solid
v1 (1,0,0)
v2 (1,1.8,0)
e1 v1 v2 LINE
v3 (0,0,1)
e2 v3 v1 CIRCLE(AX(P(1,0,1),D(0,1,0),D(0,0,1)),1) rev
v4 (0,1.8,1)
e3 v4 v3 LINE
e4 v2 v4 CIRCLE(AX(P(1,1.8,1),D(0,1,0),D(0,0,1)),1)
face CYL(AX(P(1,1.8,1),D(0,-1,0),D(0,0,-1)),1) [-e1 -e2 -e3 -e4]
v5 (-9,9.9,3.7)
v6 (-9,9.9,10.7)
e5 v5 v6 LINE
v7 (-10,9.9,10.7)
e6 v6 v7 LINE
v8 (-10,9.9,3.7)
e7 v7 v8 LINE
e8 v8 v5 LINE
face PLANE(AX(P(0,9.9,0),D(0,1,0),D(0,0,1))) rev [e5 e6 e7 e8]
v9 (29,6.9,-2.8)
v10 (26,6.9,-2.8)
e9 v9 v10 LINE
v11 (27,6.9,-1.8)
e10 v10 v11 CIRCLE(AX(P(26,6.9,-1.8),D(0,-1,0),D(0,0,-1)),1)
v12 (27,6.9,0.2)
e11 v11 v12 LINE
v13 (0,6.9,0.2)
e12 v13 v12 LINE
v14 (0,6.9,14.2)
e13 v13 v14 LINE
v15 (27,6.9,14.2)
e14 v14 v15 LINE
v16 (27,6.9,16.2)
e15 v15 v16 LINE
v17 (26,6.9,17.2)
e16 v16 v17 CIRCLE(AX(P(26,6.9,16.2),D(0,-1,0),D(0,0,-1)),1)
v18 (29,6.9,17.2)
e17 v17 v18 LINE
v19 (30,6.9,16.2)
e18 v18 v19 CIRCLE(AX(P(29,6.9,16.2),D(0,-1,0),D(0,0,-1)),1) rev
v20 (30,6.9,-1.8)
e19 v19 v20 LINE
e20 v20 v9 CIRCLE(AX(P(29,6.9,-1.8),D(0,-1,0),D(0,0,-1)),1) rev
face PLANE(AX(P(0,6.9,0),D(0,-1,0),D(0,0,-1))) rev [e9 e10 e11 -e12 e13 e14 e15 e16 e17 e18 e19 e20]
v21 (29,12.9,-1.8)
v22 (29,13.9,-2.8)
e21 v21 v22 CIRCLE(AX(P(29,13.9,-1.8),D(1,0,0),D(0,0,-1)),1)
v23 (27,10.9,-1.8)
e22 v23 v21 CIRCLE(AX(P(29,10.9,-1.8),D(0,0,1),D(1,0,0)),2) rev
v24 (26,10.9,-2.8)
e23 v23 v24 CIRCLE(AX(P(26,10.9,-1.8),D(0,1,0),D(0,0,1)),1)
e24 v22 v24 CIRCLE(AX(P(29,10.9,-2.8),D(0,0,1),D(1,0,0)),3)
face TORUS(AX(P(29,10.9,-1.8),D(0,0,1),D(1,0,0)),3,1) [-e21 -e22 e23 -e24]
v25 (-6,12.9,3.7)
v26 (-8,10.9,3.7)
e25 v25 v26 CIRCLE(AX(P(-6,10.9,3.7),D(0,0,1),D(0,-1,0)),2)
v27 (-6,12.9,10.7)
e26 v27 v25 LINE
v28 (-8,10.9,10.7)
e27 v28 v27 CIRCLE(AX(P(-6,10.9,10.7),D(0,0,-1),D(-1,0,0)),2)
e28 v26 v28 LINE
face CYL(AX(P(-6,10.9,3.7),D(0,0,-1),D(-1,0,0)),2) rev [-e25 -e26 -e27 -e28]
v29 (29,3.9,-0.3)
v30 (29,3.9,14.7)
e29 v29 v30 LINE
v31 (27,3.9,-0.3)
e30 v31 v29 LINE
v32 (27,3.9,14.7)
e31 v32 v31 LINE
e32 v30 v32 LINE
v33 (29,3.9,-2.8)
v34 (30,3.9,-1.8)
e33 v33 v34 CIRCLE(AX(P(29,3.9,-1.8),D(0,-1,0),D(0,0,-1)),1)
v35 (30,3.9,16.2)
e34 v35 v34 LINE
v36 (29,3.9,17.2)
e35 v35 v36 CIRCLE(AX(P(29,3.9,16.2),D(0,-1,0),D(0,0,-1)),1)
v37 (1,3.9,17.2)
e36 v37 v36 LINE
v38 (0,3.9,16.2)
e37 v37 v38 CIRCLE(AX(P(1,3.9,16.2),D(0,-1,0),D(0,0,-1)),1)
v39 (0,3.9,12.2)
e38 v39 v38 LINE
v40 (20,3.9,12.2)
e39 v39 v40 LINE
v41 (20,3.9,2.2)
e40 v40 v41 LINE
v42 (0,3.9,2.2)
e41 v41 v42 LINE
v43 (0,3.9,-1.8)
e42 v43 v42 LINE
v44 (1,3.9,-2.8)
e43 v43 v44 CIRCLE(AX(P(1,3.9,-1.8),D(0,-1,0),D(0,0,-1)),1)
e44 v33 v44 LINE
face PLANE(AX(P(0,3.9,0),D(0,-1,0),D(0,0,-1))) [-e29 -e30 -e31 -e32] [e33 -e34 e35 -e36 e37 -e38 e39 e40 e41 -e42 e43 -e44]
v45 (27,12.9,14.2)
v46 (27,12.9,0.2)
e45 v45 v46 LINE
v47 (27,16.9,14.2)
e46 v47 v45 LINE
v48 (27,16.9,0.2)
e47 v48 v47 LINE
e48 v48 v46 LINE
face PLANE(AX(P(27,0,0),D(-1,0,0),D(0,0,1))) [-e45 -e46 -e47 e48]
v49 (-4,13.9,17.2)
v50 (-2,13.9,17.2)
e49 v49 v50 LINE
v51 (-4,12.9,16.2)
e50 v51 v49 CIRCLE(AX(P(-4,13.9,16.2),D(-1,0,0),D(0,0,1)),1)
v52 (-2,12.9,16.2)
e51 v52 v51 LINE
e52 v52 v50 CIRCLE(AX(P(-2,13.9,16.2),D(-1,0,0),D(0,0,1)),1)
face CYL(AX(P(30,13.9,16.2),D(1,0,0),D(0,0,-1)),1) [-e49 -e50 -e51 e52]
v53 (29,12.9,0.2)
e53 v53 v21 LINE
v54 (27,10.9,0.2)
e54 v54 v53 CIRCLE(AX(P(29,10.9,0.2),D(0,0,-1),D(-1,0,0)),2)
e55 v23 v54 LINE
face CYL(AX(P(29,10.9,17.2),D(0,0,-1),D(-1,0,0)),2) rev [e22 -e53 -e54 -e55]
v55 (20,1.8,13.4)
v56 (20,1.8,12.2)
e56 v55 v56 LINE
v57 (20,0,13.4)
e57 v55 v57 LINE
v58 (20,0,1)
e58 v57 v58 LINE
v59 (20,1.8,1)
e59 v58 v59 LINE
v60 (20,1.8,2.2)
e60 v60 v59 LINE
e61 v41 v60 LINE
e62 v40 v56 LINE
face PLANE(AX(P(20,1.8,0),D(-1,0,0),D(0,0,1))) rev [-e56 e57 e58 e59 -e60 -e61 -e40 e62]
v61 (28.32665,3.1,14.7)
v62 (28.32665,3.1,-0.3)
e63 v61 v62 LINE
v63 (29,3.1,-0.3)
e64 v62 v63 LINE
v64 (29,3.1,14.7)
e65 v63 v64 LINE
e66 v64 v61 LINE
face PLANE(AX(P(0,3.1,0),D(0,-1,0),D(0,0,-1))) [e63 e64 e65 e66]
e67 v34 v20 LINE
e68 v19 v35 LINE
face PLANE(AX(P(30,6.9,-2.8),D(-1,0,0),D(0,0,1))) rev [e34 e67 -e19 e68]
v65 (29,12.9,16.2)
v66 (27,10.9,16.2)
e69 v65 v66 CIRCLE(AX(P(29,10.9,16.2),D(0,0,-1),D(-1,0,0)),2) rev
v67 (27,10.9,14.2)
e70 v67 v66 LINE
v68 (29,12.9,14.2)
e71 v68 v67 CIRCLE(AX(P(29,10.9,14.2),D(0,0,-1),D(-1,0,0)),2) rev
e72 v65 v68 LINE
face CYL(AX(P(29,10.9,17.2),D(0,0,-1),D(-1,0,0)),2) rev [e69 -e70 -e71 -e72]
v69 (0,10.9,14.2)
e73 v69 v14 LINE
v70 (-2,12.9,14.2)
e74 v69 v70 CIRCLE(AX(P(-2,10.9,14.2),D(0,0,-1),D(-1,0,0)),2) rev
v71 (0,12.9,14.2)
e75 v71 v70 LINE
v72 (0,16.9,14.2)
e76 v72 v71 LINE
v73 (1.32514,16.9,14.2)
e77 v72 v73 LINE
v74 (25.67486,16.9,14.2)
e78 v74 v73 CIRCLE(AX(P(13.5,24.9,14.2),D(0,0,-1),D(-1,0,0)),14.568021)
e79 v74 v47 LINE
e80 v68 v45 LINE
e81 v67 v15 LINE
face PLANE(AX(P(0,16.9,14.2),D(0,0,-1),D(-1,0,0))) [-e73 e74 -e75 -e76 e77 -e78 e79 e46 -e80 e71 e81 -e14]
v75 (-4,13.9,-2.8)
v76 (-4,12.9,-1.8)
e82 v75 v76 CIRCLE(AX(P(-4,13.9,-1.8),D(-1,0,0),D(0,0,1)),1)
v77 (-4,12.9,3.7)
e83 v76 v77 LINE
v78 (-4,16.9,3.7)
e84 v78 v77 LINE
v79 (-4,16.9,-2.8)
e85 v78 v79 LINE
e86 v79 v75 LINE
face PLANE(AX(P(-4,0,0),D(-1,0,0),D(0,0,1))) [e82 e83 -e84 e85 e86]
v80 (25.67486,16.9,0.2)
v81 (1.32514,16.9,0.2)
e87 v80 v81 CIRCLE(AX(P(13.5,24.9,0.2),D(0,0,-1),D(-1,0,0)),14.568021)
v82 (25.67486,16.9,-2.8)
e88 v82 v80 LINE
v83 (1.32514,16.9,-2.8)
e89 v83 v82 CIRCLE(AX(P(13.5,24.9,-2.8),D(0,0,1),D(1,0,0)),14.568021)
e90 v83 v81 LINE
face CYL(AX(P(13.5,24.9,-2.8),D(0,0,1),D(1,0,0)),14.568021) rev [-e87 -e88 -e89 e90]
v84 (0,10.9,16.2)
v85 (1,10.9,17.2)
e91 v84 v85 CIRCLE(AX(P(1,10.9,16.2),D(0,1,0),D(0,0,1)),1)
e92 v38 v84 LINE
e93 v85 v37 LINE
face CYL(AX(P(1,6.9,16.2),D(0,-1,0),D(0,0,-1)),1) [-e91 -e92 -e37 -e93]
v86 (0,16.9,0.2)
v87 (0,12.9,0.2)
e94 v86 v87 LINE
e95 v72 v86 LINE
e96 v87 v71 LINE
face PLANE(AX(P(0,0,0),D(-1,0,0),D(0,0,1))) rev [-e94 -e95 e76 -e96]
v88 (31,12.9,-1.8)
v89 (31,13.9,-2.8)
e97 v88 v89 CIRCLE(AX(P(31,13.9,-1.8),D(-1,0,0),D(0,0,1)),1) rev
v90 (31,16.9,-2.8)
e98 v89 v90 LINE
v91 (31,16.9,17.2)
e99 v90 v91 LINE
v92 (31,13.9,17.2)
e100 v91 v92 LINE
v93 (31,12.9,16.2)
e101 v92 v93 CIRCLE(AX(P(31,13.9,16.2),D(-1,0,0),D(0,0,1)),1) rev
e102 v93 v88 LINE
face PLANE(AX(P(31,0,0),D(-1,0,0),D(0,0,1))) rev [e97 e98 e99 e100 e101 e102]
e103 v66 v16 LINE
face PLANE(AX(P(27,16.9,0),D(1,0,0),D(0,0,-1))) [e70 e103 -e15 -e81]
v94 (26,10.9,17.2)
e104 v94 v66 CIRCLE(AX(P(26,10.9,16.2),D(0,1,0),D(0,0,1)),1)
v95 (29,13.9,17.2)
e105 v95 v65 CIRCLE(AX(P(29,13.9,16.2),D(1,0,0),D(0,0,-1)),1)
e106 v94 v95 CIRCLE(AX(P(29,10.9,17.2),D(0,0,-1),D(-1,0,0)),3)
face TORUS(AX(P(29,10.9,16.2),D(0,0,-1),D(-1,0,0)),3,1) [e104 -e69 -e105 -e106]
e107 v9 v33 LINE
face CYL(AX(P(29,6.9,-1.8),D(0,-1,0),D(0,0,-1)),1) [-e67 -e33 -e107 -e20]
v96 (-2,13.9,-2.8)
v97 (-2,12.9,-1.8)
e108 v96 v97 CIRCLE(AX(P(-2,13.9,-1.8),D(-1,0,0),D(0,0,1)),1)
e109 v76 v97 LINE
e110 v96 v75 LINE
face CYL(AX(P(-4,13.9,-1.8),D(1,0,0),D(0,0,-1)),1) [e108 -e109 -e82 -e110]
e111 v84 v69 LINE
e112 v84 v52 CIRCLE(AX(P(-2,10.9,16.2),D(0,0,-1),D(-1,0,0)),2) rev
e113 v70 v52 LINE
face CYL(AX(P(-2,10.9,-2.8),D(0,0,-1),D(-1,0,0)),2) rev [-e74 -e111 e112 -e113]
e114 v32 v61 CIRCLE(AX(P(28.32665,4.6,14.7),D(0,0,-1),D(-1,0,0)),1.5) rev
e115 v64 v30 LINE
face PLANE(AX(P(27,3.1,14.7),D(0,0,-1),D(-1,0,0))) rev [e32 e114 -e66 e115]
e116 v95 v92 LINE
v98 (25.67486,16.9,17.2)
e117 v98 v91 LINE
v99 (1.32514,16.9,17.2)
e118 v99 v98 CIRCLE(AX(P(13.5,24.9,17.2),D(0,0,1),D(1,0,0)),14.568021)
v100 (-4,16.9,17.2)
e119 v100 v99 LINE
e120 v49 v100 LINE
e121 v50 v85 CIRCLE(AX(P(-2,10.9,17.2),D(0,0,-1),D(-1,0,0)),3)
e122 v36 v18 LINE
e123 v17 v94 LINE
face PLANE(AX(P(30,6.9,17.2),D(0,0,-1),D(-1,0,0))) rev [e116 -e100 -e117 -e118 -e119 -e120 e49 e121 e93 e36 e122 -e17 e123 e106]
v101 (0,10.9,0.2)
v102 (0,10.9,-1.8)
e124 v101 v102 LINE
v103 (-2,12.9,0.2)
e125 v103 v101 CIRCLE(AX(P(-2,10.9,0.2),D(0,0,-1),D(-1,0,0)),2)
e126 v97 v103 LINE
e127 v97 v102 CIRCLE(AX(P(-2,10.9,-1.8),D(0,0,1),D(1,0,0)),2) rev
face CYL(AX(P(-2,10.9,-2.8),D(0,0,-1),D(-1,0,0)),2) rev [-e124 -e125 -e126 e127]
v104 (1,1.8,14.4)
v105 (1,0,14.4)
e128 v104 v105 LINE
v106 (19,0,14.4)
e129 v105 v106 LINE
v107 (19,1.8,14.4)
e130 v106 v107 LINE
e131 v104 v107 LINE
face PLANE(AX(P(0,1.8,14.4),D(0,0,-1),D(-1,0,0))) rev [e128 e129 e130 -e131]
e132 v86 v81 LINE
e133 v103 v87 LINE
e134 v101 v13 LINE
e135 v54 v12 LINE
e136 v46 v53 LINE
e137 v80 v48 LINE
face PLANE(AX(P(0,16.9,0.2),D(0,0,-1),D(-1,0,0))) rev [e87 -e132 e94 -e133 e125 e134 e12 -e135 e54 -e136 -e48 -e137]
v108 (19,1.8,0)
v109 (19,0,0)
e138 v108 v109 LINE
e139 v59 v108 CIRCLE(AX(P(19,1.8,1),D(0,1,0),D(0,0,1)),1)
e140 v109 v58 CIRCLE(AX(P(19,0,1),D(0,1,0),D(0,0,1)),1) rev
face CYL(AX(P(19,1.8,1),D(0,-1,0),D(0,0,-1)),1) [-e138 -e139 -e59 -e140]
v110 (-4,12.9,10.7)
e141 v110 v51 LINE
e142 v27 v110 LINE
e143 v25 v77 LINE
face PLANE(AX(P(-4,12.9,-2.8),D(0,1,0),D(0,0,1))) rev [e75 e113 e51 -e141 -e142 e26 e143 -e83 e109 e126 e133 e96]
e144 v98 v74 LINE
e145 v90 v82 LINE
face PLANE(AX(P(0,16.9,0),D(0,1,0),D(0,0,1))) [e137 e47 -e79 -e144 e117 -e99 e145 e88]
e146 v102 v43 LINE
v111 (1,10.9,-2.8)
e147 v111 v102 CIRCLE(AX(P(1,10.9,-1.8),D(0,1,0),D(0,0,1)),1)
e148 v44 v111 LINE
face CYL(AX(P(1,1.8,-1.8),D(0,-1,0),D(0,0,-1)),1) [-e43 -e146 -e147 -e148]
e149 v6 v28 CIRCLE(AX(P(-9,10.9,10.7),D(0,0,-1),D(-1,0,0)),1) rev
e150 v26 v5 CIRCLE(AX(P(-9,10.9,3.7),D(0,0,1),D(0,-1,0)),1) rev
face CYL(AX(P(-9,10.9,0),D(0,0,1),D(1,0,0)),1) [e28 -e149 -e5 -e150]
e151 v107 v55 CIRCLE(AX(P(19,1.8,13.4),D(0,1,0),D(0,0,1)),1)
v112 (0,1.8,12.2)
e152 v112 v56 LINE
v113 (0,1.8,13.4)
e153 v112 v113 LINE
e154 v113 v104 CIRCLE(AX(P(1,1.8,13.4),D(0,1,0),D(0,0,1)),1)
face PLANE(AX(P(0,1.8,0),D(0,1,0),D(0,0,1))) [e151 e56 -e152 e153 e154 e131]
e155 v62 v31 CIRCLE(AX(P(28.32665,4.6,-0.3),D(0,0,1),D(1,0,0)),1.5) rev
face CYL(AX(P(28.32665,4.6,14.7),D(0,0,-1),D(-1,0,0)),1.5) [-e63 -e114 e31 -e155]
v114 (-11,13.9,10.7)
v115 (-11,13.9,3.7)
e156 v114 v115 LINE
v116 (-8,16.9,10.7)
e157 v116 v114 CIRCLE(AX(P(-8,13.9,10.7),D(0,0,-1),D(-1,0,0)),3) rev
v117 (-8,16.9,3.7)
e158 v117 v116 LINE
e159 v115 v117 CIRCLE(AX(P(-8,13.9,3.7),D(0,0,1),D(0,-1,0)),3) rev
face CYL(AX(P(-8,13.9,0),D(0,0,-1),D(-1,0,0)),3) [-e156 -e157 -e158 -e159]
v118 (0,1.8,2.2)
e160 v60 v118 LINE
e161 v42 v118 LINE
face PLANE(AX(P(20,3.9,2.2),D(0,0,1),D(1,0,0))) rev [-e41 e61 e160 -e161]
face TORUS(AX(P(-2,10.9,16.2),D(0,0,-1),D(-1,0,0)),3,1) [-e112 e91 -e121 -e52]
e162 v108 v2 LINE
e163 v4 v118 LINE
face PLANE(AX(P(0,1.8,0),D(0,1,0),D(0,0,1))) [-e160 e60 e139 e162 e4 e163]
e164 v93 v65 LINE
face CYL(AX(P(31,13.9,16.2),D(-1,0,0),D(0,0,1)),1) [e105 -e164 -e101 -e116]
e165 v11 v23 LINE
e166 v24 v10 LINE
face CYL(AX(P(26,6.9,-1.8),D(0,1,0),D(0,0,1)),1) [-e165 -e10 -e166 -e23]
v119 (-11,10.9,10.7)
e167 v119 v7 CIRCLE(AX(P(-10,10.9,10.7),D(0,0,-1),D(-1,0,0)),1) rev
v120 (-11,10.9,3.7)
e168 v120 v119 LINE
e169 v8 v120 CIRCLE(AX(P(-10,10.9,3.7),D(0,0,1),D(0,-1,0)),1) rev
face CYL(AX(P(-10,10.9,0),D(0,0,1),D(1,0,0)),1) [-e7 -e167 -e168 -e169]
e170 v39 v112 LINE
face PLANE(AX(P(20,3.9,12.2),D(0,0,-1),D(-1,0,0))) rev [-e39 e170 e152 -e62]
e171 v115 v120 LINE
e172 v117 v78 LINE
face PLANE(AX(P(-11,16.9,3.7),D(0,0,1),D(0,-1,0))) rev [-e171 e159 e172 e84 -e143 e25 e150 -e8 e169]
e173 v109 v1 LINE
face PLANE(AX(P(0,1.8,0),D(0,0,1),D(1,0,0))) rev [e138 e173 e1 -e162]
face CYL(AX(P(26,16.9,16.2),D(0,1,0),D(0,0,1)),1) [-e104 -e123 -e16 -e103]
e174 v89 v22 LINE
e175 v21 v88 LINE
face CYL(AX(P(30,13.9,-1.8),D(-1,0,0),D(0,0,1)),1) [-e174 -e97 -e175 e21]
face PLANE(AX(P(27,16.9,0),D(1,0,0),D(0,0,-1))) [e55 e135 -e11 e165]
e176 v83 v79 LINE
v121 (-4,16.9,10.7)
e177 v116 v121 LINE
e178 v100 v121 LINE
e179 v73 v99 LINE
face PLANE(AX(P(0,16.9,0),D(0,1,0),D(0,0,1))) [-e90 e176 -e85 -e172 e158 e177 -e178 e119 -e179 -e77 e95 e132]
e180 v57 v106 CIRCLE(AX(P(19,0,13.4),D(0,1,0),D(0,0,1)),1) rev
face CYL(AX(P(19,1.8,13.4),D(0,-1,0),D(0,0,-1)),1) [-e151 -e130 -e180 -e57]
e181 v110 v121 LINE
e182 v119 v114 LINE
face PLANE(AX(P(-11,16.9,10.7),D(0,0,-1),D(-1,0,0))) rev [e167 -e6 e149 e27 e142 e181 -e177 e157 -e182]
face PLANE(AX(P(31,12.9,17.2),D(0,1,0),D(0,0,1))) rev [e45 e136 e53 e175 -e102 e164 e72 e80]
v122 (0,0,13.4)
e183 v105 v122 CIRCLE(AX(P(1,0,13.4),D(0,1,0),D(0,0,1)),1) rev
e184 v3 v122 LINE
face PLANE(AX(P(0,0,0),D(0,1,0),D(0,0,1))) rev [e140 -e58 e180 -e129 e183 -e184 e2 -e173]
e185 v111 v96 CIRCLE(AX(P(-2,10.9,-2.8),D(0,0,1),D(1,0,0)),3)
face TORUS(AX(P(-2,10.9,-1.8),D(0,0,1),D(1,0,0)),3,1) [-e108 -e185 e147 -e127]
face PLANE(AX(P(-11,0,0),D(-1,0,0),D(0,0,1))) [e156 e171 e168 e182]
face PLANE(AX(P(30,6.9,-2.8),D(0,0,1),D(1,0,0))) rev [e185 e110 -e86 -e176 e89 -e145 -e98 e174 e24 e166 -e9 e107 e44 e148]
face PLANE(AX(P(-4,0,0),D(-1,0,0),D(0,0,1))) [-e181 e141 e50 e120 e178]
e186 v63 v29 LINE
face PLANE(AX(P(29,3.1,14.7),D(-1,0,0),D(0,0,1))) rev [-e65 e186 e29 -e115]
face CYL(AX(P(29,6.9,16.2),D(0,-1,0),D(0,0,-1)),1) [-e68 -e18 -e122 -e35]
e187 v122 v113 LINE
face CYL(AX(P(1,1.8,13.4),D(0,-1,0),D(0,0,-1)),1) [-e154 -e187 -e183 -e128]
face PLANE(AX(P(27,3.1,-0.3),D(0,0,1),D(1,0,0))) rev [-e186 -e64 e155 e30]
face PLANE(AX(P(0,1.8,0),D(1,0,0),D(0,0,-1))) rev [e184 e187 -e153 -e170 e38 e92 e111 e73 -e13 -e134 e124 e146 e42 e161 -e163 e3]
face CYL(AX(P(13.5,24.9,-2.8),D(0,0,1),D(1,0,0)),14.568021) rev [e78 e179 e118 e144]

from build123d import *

# Parameters (mm, degrees)
SKETCH1_W            = 20
SKETCH1_H            = 14.4
BOSS_EXTRUDE1_DEPTH  = 1.8
SKETCH2_W            = 20
SKETCH2_H            = 10
BOSS_EXTRUDE2_DEPTH  = 2.1
SKETCH3_W            = 30
SKETCH3_H            = 20
BOSS_EXTRUDE3_DEPTH  = 3
SKETCH4_W            = 2
SKETCH4_H            = 15
BOSS_EXTRUDE4_DEPTH  = 0.8
FILLET1_R            = 1.5
SKETCH5_W            = 27
SKETCH5_H            = 3
BOSS_EXTRUDE6_DEPTH  = 10
CUT_EXTRUDE1_DEPTH   = 40.819718733
SKETCH7_W            = 20
SKETCH7_H            = 4
BOSS_EXTRUDE7_DEPTH  = 4
SKETCH8_W            = 20
SKETCH8_H            = 4
BOSS_EXTRUDE8_DEPTH  = 4
FILLET3_R            = 2
FILLET2_R            = 1
FILLET4_R            = 1
SKETCH10_W           = 7
SKETCH10_H           = 4
BOSS_EXTRUDE10_DEPTH = 7
SKETCH11_W           = 3
SKETCH11_H           = 7
BOSS_EXTRUDE11_DEPTH = 3
FILLET5_R            = 2
FILLET6_R            = 1
FILLET7_R            = 3


# Some blends are built 0.0001 mm under size
with BuildPart() as part:
    # Sketch1 → Boss-Extrude1 (new body)
    with BuildSketch(Plane(origin=(0, 0, 0), x_dir=(1, 0, 0), z_dir=(0, 1, 0))):
        with Locations((10, -7.2)):
            Rectangle(SKETCH1_W, SKETCH1_H)
    extrude(amount=BOSS_EXTRUDE1_DEPTH)

    # Sketch2 → Boss-Extrude2 (add)
    with BuildSketch(Plane(origin=(0, 1.8, 0), x_dir=(1, 0, 0), z_dir=(0, 1, 0))):
        with Locations((10, -7.2)):
            Rectangle(SKETCH2_W, SKETCH2_H)
    extrude(amount=BOSS_EXTRUDE2_DEPTH)

    # Sketch3 → Boss-Extrude3 (add)
    with BuildSketch(Plane(origin=(0, 3.9, 0), x_dir=(1, 0, 0), z_dir=(0, 1, 0))):
        with Locations((15, -7.2)):
            Rectangle(SKETCH3_W, SKETCH3_H)
    extrude(amount=BOSS_EXTRUDE3_DEPTH)

    # Sketch4 → Boss-Extrude4 (add)
    with BuildSketch(Plane(origin=(0, 3.9, 0), x_dir=(-1, 0, 0), z_dir=(0, -1, 0))):
        with Locations((-28, -7.2)):
            Rectangle(SKETCH4_W, SKETCH4_H)
    extrude(amount=BOSS_EXTRUDE4_DEPTH)

    # Fillet1
    # the kernel refuses this fillet: 1.5 mm, written as the material it takes off along each edge
    with BuildSketch(Plane(origin=(27, 3.1, -3.61662479), x_dir=(0, 1, 0), z_dir=(0, 0, 1))) as fillet1_piece_1:
        with BuildLine():
            CenterArc((1.5, -1.326649916), FILLET1_R, 117.818139285, 62.181860715)
            Line((0, -1.326649916), (-0.03, -1.326649916))
            Line((-0.03, -1.326649916), (-0.03, 0))
            Line((-0.03, 0), (0, 0.03))
            ThreePointArc((0, 0.03), (0.4, 0.03), (0.786, 0.026532998))
            Line((0.786, 0.026532998), (0.8, 0))
        make_face()
    extrude(amount=21.633249581, mode=Mode.SUBTRACT)

    # Sketch5 → Boss-Extrude6 (add)
    with BuildSketch(Plane(origin=(0, 6.9, 0), x_dir=(1, 0, 0), z_dir=(0, 1, 0))):
        with Locations((13.5, 1.3)):
            Rectangle(SKETCH5_W, SKETCH5_H)
        with Locations((13.5, -15.7)):
            Rectangle(SKETCH5_W, SKETCH5_H)
    extrude(amount=BOSS_EXTRUDE6_DEPTH)

    # Sketch6 → Cut-Extrude1 (cut, through all)
    with BuildSketch(Plane.XY.offset(17.2)):
        with BuildLine():
            Line((1.325139576, 16.9), (25.674860424, 16.9))
            ThreePointArc((25.674860424, 16.9), (13.5, 10.331979326), (1.325139576, 16.9))
        make_face()
    extrude(amount=-CUT_EXTRUDE1_DEPTH, mode=Mode.SUBTRACT)

    # Sketch7 → Boss-Extrude7 (add)
    with BuildSketch(Plane(origin=(27, 0, 0), x_dir=(0, 0, -1), z_dir=(1, 0, 0))):
        with Locations((-7.2, 14.9)):
            Rectangle(SKETCH7_W, SKETCH7_H)
    extrude(amount=BOSS_EXTRUDE7_DEPTH)

    # Sketch8 → Boss-Extrude8 (add)
    with BuildSketch(Plane.ZY):
        with Locations((7.2, 14.9)):
            Rectangle(SKETCH8_W, SKETCH8_H)
    extrude(amount=BOSS_EXTRUDE8_DEPTH)

    # Fillet3
    fillet3_edges = [part.edges().sort_by_distance(p)[0] for p in [
        (27, 12.9, 15.7),
        (27, 12.9, -1.3),
        (0, 12.9, 15.7),
        (0, 12.9, -1.3),
    ]]
    fillet(fillet3_edges, radius=FILLET3_R)

    # Fillet2
    fillet2_edges = [part.edges().sort_by_distance(p)[0] for p in [
        (-3, 12.9, -2.8),
        (-3, 12.9, 17.2),
        (0, 7.4, -2.8),
        (0, 7.4, 17.2),
        (-0.585786438, 12.314213562, 17.2),
        (-0.585786438, 12.314213562, -2.8),
        (30, 5.4, 17.2),
        (30, 5.4, -2.8),
        (0, 0.9, 0),
        (20, 0.9, 0),
        (20, 0.9, 14.4),
        (0, 0.9, 14.4),
    ]]
    fillet(fillet2_edges, radius=FILLET2_R)

    # Fillet4
    fillet4_edges = [part.edges().sort_by_distance(p)[0] for p in [
        (30, 12.9, 17.2),
        (30, 12.9, -2.8),
        (27, 8.9, -2.8),
        (27, 8.9, 17.2),
        (27.585786438, 12.314213562, -2.8),
        (27.585786438, 12.314213562, 17.2),
    ]]
    fillet(fillet4_edges, radius=FILLET4_R)

    # Sketch10 → Boss-Extrude10 (add)
    with BuildSketch(Plane.ZY.offset(4)):
        with Locations((7.2, 14.9)):
            Rectangle(SKETCH10_W, SKETCH10_H)
    extrude(amount=BOSS_EXTRUDE10_DEPTH)

    # Sketch11 → Boss-Extrude11 (add)
    with BuildSketch(Plane(origin=(0, 12.9, 0), x_dir=(-1, 0, 0), z_dir=(0, -1, 0))):
        with Locations((9.5, -7.2)):
            Rectangle(SKETCH11_W, SKETCH11_H)
    extrude(amount=BOSS_EXTRUDE11_DEPTH)

    # Fillet5
    fillet5_edges = [part.edges().sort_by_distance(p)[0] for p in [
        (-8, 12.9, 7.2),
    ]]
    fillet(fillet5_edges, radius=FILLET5_R)

    # Fillet6
    fillet6_edges = [part.edges().sort_by_distance(p)[0] for p in [
        (-11, 9.9, 7.2),
        (-8, 9.9, 7.2),
    ]]
    fillet(fillet6_edges, radius=FILLET6_R - 0.0001)  # a hair under: the kernel refuses the full size

    # Fillet7
    fillet7_edges = [part.edges().sort_by_distance(p)[0] for p in [
        (-11, 16.9, 7.2),
    ]]
    fillet(fillet7_edges, radius=FILLET7_R)


solid = part.part
